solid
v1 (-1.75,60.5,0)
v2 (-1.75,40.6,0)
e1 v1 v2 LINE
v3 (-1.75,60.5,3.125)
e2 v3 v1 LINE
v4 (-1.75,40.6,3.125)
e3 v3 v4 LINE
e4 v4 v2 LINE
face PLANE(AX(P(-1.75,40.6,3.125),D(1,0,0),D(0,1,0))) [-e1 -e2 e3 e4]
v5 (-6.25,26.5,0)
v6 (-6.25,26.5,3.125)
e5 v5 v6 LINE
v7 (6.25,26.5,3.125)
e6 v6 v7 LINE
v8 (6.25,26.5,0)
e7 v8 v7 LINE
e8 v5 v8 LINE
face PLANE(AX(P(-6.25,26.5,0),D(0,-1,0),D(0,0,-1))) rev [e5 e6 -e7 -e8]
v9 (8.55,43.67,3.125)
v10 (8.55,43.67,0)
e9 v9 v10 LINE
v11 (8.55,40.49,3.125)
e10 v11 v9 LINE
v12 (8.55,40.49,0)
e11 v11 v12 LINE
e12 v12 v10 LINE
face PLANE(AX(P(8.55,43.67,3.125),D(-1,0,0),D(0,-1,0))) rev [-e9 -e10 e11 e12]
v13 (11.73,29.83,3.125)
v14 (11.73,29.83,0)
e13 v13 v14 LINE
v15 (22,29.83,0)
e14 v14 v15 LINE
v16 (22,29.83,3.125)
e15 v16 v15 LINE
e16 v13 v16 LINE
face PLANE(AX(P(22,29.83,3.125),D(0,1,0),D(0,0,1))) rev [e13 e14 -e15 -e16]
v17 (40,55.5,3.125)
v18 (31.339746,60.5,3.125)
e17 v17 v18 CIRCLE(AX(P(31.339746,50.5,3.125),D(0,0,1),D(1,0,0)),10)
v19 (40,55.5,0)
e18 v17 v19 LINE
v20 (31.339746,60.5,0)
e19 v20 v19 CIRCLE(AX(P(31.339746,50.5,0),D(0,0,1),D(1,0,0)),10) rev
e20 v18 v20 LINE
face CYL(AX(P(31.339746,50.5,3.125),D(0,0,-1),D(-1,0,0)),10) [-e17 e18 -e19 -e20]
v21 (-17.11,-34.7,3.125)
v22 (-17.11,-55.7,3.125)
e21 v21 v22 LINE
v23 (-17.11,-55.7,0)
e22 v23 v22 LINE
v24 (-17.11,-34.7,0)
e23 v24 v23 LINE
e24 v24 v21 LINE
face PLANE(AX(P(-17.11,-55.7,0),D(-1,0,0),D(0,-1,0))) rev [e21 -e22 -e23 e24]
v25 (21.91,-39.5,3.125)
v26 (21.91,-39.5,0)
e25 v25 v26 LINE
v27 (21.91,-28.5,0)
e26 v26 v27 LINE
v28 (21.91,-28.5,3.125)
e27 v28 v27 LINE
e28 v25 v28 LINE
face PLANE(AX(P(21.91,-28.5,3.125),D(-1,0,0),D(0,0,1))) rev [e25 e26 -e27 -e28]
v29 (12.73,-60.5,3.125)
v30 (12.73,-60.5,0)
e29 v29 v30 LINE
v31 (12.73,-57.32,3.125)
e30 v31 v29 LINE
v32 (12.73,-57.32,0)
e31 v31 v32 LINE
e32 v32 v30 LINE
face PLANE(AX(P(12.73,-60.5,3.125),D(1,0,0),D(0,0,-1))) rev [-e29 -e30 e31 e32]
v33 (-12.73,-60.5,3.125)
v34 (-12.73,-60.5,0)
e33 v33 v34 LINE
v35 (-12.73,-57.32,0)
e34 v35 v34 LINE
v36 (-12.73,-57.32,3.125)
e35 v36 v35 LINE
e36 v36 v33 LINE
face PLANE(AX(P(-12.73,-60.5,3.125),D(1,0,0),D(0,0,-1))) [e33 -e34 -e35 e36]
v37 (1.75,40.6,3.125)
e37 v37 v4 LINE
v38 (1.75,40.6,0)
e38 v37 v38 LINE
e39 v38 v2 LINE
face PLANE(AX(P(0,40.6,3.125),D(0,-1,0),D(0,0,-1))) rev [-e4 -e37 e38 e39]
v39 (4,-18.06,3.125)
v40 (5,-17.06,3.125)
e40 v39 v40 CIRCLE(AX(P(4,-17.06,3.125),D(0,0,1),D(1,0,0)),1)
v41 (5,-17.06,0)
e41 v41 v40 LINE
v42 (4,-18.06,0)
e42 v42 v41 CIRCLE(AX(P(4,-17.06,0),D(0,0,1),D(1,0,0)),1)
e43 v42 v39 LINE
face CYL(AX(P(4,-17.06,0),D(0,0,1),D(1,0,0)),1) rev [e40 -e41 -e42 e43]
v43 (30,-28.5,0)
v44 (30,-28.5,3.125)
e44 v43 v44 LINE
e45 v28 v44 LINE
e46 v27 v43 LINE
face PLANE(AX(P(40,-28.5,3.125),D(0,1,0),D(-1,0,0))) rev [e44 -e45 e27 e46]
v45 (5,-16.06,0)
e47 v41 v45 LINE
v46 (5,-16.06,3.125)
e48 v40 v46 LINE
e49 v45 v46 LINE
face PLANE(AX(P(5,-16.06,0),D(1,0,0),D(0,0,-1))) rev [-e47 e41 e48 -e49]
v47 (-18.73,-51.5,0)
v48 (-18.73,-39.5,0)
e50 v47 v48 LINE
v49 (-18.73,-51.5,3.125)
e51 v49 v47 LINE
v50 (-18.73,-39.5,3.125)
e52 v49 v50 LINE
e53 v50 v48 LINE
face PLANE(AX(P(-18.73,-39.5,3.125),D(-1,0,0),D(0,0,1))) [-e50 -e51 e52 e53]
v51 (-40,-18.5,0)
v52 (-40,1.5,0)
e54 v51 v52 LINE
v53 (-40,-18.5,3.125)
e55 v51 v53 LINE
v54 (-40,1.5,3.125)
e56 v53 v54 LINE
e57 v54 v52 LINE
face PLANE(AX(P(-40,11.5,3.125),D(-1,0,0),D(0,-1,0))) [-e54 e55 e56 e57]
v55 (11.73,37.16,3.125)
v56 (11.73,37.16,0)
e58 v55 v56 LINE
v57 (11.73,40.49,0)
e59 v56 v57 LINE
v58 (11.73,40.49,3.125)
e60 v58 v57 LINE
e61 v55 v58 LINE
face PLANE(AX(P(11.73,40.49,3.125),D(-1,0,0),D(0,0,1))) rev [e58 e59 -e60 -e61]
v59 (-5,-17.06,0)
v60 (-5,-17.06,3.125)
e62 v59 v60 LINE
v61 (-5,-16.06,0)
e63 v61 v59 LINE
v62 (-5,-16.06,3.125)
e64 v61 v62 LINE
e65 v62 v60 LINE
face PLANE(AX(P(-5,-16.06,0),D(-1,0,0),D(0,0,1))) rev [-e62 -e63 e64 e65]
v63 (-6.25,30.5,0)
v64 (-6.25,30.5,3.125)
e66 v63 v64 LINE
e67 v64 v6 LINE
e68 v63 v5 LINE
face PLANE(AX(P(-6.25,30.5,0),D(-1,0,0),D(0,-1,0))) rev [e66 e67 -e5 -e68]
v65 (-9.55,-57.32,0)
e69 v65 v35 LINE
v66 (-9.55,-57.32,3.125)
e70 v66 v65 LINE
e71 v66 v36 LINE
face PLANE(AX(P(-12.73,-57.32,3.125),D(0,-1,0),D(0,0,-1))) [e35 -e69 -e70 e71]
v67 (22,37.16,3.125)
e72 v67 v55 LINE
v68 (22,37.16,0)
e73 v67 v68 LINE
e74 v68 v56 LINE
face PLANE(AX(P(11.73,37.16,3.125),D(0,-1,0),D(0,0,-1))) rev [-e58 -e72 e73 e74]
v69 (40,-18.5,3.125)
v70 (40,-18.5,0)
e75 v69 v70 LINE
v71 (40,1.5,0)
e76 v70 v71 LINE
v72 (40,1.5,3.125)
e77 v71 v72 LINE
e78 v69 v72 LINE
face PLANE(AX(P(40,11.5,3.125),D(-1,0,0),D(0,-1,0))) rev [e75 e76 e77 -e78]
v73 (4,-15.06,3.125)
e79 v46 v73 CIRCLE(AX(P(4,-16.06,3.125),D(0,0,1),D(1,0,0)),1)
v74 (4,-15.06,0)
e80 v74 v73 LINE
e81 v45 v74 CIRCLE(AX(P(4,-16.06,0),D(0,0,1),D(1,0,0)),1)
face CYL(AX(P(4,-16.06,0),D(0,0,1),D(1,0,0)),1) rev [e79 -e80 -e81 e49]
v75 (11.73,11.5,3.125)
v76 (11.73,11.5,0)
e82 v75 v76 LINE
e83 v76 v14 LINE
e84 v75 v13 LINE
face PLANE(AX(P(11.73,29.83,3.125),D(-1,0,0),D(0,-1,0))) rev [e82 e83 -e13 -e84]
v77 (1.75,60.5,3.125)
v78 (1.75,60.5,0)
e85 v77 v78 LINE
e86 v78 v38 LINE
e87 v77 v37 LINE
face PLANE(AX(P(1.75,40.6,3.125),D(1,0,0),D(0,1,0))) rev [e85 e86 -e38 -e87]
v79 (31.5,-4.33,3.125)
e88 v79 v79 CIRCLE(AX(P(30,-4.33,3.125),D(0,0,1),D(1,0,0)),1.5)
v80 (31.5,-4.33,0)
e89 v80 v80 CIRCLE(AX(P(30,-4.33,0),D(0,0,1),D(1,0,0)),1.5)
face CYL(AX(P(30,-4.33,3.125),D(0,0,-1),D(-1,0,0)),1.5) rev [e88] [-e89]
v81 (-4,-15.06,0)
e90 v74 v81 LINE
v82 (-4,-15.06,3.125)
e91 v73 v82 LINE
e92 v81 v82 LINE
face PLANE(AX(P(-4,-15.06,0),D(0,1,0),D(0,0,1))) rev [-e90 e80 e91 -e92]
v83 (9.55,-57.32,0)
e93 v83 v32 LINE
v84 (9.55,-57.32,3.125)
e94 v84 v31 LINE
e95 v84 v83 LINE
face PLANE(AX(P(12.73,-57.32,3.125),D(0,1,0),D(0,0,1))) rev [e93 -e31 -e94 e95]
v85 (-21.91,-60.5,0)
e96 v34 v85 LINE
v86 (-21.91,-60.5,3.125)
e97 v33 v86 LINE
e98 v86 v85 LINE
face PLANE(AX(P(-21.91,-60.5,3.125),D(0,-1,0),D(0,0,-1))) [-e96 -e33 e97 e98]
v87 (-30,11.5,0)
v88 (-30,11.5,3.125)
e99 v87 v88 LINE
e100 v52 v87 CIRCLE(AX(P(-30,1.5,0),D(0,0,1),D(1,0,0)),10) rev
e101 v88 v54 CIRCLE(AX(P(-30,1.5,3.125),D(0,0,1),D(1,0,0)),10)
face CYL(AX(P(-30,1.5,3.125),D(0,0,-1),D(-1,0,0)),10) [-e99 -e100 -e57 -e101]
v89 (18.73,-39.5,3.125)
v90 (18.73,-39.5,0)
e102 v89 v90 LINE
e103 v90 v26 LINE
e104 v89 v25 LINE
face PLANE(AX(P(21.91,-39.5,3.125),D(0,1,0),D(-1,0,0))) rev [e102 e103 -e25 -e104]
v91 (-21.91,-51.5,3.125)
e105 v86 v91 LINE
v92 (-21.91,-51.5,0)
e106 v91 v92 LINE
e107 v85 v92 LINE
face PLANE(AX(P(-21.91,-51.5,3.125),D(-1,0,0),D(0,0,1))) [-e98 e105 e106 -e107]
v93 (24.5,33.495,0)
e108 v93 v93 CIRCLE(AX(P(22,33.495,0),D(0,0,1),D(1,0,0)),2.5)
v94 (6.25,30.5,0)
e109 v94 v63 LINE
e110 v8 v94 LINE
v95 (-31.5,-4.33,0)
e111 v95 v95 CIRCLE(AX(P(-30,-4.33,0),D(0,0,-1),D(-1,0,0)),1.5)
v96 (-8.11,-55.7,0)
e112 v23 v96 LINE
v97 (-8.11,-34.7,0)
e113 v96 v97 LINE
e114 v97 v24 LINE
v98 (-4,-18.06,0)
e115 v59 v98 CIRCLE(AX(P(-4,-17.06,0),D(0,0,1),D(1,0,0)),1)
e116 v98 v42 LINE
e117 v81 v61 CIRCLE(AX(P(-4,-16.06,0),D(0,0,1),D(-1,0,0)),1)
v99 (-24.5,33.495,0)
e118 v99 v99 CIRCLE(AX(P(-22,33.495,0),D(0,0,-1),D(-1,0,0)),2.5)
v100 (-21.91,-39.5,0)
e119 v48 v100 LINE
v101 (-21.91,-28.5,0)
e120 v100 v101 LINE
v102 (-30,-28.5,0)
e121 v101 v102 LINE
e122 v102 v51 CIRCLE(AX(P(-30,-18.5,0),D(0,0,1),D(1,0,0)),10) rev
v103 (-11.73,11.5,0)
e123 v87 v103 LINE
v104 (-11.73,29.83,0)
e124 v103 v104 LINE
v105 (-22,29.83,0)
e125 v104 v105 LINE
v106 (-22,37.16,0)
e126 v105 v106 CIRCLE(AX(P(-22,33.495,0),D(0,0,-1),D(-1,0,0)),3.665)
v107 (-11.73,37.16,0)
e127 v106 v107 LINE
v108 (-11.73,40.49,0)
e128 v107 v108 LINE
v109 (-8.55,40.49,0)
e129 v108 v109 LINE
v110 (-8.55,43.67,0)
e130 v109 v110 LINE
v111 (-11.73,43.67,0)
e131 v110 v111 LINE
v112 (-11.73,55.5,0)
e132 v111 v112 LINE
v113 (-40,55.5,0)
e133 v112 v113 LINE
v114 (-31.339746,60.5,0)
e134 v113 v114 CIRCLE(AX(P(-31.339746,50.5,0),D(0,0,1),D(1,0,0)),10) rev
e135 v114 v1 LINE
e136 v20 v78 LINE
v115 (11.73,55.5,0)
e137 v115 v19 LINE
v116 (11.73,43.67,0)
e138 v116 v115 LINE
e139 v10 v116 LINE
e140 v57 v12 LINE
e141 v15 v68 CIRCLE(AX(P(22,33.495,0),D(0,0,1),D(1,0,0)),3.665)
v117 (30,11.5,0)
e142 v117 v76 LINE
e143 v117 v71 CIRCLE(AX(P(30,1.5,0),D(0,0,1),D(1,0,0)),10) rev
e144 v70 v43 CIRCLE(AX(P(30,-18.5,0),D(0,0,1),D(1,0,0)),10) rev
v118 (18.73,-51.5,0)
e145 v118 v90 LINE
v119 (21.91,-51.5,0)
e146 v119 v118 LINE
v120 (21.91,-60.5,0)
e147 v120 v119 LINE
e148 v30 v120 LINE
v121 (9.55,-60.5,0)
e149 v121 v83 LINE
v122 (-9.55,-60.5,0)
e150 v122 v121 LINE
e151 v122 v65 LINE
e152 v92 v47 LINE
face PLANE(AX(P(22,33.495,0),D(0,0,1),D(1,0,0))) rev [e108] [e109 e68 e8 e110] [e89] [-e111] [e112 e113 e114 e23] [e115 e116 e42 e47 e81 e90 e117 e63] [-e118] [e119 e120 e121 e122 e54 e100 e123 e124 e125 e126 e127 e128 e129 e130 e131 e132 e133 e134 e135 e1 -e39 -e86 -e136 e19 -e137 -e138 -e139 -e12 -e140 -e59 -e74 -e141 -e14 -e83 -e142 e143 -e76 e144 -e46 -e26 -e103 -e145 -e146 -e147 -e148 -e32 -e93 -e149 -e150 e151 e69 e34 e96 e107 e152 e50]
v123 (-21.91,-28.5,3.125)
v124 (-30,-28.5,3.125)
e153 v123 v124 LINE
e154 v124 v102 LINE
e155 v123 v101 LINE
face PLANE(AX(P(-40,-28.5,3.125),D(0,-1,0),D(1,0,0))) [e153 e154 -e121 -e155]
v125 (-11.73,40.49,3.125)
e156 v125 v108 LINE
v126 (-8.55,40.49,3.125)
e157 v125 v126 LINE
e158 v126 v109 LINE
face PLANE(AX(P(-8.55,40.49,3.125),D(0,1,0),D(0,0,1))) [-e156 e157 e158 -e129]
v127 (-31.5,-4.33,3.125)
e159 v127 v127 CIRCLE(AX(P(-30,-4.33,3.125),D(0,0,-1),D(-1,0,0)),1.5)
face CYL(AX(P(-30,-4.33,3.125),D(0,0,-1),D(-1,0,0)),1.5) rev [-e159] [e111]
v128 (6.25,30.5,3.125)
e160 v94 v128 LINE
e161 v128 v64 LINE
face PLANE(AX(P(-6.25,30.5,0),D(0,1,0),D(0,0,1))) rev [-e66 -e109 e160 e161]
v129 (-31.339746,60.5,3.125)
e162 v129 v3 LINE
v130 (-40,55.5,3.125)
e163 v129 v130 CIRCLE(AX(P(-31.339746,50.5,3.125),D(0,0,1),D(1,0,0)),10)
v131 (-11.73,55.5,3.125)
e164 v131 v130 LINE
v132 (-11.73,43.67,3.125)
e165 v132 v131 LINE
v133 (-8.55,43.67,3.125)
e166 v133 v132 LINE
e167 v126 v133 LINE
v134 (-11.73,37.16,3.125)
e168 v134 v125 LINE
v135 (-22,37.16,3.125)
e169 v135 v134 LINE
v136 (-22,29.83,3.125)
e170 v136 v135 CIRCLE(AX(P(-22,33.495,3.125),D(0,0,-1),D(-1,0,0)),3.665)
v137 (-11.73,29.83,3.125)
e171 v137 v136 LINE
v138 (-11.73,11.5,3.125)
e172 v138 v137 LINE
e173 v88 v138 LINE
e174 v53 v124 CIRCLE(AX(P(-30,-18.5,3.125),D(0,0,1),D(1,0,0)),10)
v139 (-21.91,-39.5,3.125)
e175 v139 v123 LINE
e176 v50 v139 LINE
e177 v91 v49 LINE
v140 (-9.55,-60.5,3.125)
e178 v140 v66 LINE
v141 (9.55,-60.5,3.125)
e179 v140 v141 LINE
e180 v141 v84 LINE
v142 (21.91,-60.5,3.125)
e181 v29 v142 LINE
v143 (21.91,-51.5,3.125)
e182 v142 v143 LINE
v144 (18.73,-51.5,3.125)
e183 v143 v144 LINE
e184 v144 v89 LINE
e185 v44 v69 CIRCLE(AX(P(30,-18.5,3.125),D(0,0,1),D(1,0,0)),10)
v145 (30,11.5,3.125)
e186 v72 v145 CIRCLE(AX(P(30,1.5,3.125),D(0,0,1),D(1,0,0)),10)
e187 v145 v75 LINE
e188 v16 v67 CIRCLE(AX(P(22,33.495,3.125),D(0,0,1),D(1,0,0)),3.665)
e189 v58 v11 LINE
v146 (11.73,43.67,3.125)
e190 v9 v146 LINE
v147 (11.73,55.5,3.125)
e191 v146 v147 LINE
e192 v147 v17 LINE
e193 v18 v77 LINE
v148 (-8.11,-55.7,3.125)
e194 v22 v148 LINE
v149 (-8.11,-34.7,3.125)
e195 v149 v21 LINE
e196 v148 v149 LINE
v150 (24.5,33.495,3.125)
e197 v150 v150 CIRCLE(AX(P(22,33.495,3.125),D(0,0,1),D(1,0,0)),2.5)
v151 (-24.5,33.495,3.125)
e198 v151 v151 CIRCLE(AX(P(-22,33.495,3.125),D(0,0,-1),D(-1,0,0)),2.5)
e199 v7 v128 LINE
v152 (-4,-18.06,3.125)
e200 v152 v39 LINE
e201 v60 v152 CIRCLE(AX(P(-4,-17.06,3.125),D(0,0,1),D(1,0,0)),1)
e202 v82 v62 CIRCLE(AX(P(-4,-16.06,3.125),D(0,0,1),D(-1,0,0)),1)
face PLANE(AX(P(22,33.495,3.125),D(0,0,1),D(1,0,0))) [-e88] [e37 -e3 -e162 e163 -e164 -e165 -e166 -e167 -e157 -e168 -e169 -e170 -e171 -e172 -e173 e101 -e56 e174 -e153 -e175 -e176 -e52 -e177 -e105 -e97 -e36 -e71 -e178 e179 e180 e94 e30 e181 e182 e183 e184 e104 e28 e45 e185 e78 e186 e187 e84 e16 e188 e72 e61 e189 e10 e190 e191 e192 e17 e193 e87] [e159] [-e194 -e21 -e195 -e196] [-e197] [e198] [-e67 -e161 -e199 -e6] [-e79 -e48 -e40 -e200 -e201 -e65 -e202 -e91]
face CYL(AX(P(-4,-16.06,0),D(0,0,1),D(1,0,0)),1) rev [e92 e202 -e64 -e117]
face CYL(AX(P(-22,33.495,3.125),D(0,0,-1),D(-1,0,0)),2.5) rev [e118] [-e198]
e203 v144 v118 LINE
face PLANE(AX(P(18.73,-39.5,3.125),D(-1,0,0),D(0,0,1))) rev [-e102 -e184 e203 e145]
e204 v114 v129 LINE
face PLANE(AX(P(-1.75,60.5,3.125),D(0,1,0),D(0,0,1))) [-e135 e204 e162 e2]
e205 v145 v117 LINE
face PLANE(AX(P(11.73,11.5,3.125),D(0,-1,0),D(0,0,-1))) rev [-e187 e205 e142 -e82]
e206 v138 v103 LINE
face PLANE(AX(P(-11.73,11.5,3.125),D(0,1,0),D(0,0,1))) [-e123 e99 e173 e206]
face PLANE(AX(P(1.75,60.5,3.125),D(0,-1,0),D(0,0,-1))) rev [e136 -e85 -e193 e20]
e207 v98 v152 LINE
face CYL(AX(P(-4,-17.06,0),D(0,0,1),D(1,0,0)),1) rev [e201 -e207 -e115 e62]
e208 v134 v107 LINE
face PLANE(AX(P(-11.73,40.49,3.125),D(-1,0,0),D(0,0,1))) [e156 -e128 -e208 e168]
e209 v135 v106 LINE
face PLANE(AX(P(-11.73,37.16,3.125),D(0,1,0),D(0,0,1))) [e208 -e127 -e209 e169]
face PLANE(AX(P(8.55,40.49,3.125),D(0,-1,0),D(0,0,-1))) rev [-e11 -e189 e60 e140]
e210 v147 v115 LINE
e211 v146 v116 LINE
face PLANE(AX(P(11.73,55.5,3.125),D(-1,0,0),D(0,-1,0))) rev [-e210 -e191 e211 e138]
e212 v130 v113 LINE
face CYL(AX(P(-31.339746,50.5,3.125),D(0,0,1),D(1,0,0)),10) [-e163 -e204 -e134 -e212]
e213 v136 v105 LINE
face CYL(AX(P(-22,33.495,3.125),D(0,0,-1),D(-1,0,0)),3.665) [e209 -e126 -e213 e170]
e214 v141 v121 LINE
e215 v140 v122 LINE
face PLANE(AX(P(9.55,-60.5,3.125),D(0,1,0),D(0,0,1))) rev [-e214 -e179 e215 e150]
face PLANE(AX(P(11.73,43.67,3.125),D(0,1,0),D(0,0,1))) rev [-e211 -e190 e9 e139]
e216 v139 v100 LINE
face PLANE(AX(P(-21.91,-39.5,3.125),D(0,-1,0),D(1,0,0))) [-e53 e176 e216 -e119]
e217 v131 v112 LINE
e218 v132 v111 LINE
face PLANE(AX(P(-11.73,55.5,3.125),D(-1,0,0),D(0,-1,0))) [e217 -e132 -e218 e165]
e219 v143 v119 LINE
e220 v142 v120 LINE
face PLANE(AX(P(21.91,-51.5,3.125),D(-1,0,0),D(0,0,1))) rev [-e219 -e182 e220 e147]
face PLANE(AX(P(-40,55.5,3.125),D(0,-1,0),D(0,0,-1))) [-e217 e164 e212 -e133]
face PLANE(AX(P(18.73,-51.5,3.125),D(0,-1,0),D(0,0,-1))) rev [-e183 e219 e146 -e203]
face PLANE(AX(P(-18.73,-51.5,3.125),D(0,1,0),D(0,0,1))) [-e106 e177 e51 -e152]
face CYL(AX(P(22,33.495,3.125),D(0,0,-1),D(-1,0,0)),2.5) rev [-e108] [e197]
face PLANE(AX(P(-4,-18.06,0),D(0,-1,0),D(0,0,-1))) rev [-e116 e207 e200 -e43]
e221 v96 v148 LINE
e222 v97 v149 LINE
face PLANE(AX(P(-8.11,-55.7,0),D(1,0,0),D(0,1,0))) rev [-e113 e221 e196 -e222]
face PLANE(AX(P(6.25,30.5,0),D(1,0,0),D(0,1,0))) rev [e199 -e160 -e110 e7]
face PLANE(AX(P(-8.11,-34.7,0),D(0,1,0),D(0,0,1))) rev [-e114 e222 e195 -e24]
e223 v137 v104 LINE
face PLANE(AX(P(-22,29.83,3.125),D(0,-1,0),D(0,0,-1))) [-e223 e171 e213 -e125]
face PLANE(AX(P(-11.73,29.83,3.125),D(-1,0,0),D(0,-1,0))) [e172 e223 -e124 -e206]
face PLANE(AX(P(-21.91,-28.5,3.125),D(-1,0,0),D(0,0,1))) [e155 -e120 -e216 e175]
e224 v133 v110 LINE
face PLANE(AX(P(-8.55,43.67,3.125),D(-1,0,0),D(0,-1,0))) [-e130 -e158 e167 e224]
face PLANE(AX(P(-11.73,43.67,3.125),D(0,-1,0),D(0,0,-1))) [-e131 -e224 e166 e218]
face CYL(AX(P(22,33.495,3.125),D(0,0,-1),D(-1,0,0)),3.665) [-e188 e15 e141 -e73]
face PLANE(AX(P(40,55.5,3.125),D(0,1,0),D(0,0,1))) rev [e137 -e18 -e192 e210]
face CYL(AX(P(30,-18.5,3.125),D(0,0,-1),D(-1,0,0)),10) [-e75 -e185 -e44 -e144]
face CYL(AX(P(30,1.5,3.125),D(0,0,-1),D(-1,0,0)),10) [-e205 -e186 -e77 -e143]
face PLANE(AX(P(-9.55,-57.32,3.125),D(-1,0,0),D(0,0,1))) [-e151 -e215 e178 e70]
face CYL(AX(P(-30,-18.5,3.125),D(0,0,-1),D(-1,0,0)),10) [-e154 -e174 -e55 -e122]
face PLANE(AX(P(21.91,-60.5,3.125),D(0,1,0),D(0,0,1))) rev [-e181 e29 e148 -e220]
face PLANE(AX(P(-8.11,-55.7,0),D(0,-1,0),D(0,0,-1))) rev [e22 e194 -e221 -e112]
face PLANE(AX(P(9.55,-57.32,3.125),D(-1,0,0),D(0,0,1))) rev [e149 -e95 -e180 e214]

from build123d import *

# Parameters (mm, degrees)
SKETCH3_R           = 2.5
SKETCH3_R_2         = 1.5
BOSS_EXTRUDE1_DEPTH = 3.125
FILLET1_R           = 10
SKETCH4_W           = 12.5
SKETCH4_H           = 4
SKETCH4_W_2         = 9
SKETCH4_H_2         = 21
CUT_EXTRUDE2_DEPTH  = 73.594873269


with BuildPart() as part:
    # Sketch3 → Boss-Extrude1 (new body)
    with BuildSketch(Plane.XY):
        with BuildLine():
            Line((0, 23.314265754), (0, 40.6))
            Line((0, 40.6), (1.75, 40.6))
            Line((1.75, 40.6), (1.75, 60.5))
            Line((1.75, 60.5), (40, 60.5))
            Line((40, 60.5), (40, 55.5))
            Line((40, 55.5), (11.73, 55.5))
            Line((11.73, 55.5), (11.73, 43.67))
            Line((11.73, 43.67), (8.55, 43.67))
            Line((8.55, 43.67), (8.55, 40.49))
            Line((8.55, 40.49), (11.73, 40.49))
            Line((11.73, 40.49), (11.73, 37.16))
            Line((11.73, 37.16), (22, 37.16))
            ThreePointArc((22, 37.16), (25.665, 33.495), (22, 29.83))
            Line((22, 29.83), (11.73, 29.83))
            Line((11.73, 29.83), (11.73, 11.5))
            Line((11.73, 11.5), (40, 11.5))
            Line((40, 11.5), (40, -28.5))
            Line((40, -28.5), (21.91, -28.5))
            Line((21.91, -28.5), (21.91, -39.5))
            Line((21.91, -39.5), (18.73, -39.5))
            Line((18.73, -39.5), (18.73, -51.5))
            Line((18.73, -51.5), (21.91, -51.5))
            Line((21.91, -51.5), (21.91, -60.5))
            Line((21.91, -60.5), (12.73, -60.5))
            Line((12.73, -60.5), (12.73, -57.32))
            Line((12.73, -57.32), (9.55, -57.32))
            Line((9.55, -57.32), (9.55, -60.5))
            Line((9.55, -60.5), (0, -60.5))
            Line((0, -60.5), (0, 23.314265754))
        make_face()
        with Locations((22, 33.495)):
            Circle(SKETCH3_R, mode=Mode.SUBTRACT)
        with Locations((30, -4.33)):
            Circle(SKETCH3_R_2, mode=Mode.SUBTRACT)
    boss_extrude1 = extrude(amount=BOSS_EXTRUDE1_DEPTH)

    # Mirror1: Boss-Extrude1 across plane
    add(boss_extrude1.mirror(Plane(origin=(0, 23.314265754, 3.125), x_dir=(0, 0, 1), z_dir=(1, 0, 0))))

    # Fillet1
    # the kernel refuses this fillet: 10 mm, written as the material it takes off along each edge
    with BuildSketch(Plane(origin=(40, 60.5, -21.650635095), x_dir=(0, -1, 0), z_dir=(0, 0, 1))) as fillet1_piece_1:
        with BuildLine():
            CenterArc((10, -8.660254038), FILLET1_R, 120, 60)
            Line((0, -8.660254038), (-0.2, -8.660254038))
            Line((-0.2, -8.660254038), (-0.2, 0))
            Line((-0.2, 0), (0, 0.2))
            ThreePointArc((0, 0.2), (2.5, 0.2), (4.9, 0.173205081))
            Line((4.9, 0.173205081), (5, 0))
        make_face()
    extrude(amount=46.426270189, mode=Mode.SUBTRACT)
    with BuildSketch(Plane(origin=(40, 11.5, -25), x_dir=(0, -1, 0), z_dir=(0, 0, 1)), Plane(origin=(40, -28.5, -25), x_dir=(-1, 0, 0), z_dir=(0, 0, 1)), Plane(origin=(-40, 11.5, -25), x_dir=(1, 0, 0), z_dir=(0, 0, 1)), Plane(origin=(-40, -28.5, -25), x_dir=(0, 1, 0), z_dir=(0, 0, 1))) as fillet1_piece_2:
        with BuildLine():
            CenterArc((FILLET1_R, -FILLET1_R), FILLET1_R, 90, 90)
            Line((0, -FILLET1_R), (-FILLET1_R * 0.02, -FILLET1_R))
            Line((-FILLET1_R * 0.02, -FILLET1_R), (-FILLET1_R * 0.02, FILLET1_R * 0.02))
            Line((-FILLET1_R * 0.02, FILLET1_R * 0.02), (FILLET1_R, FILLET1_R * 0.02))
            Line((FILLET1_R, FILLET1_R * 0.02), (FILLET1_R, 0))
        make_face()
    extrude(amount=53.125, mode=Mode.SUBTRACT)
    with BuildSketch(Plane(origin=(-40, 60.5, -21.650635095), x_dir=(1, 0, 0), z_dir=(0, 0, 1))) as fillet1_piece_3:
        with BuildLine():
            CenterArc((8.660254038, -10), FILLET1_R, 90, 60)
            Line((0, -5), (-0.173205081, -4.9))
            ThreePointArc((-0.173205081, -4.9), (-0.2, -2.5), (-0.2, 0))
            Line((-0.2, 0), (0, 0.2))
            Line((0, 0.2), (8.660254038, 0.2))
            Line((8.660254038, 0.2), (8.660254038, 0))
        make_face()
    extrude(amount=46.426270189, mode=Mode.SUBTRACT)

    # Sketch4 → Cut-Extrude2 (cut, through all)
    with BuildSketch(Plane.XY.offset(3.125)):
        with Locations((0, 28.5)):
            Rectangle(SKETCH4_W, SKETCH4_H)
        with Locations((-12.61, -45.2)):
            Rectangle(SKETCH4_W_2, SKETCH4_H_2)
        with BuildLine():
            Line((-4, -15.06), (4, -15.06))
            ThreePointArc((4, -15.06), (4.707106781, -15.352893219), (5, -16.06))
            Line((5, -16.06), (5, -17.06))
            ThreePointArc((5, -17.06), (4.707106781, -17.767106781), (4, -18.06))
            Line((4, -18.06), (-4, -18.06))
            ThreePointArc((-4, -18.06), (-4.707106781, -17.767106781), (-5, -17.06))
            Line((-5, -17.06), (-5, -16.06))
            ThreePointArc((-5, -16.06), (-4.707106781, -15.352893219), (-4, -15.06))
        make_face()
    extrude(amount=-CUT_EXTRUDE2_DEPTH, mode=Mode.SUBTRACT)


solid = part.part
